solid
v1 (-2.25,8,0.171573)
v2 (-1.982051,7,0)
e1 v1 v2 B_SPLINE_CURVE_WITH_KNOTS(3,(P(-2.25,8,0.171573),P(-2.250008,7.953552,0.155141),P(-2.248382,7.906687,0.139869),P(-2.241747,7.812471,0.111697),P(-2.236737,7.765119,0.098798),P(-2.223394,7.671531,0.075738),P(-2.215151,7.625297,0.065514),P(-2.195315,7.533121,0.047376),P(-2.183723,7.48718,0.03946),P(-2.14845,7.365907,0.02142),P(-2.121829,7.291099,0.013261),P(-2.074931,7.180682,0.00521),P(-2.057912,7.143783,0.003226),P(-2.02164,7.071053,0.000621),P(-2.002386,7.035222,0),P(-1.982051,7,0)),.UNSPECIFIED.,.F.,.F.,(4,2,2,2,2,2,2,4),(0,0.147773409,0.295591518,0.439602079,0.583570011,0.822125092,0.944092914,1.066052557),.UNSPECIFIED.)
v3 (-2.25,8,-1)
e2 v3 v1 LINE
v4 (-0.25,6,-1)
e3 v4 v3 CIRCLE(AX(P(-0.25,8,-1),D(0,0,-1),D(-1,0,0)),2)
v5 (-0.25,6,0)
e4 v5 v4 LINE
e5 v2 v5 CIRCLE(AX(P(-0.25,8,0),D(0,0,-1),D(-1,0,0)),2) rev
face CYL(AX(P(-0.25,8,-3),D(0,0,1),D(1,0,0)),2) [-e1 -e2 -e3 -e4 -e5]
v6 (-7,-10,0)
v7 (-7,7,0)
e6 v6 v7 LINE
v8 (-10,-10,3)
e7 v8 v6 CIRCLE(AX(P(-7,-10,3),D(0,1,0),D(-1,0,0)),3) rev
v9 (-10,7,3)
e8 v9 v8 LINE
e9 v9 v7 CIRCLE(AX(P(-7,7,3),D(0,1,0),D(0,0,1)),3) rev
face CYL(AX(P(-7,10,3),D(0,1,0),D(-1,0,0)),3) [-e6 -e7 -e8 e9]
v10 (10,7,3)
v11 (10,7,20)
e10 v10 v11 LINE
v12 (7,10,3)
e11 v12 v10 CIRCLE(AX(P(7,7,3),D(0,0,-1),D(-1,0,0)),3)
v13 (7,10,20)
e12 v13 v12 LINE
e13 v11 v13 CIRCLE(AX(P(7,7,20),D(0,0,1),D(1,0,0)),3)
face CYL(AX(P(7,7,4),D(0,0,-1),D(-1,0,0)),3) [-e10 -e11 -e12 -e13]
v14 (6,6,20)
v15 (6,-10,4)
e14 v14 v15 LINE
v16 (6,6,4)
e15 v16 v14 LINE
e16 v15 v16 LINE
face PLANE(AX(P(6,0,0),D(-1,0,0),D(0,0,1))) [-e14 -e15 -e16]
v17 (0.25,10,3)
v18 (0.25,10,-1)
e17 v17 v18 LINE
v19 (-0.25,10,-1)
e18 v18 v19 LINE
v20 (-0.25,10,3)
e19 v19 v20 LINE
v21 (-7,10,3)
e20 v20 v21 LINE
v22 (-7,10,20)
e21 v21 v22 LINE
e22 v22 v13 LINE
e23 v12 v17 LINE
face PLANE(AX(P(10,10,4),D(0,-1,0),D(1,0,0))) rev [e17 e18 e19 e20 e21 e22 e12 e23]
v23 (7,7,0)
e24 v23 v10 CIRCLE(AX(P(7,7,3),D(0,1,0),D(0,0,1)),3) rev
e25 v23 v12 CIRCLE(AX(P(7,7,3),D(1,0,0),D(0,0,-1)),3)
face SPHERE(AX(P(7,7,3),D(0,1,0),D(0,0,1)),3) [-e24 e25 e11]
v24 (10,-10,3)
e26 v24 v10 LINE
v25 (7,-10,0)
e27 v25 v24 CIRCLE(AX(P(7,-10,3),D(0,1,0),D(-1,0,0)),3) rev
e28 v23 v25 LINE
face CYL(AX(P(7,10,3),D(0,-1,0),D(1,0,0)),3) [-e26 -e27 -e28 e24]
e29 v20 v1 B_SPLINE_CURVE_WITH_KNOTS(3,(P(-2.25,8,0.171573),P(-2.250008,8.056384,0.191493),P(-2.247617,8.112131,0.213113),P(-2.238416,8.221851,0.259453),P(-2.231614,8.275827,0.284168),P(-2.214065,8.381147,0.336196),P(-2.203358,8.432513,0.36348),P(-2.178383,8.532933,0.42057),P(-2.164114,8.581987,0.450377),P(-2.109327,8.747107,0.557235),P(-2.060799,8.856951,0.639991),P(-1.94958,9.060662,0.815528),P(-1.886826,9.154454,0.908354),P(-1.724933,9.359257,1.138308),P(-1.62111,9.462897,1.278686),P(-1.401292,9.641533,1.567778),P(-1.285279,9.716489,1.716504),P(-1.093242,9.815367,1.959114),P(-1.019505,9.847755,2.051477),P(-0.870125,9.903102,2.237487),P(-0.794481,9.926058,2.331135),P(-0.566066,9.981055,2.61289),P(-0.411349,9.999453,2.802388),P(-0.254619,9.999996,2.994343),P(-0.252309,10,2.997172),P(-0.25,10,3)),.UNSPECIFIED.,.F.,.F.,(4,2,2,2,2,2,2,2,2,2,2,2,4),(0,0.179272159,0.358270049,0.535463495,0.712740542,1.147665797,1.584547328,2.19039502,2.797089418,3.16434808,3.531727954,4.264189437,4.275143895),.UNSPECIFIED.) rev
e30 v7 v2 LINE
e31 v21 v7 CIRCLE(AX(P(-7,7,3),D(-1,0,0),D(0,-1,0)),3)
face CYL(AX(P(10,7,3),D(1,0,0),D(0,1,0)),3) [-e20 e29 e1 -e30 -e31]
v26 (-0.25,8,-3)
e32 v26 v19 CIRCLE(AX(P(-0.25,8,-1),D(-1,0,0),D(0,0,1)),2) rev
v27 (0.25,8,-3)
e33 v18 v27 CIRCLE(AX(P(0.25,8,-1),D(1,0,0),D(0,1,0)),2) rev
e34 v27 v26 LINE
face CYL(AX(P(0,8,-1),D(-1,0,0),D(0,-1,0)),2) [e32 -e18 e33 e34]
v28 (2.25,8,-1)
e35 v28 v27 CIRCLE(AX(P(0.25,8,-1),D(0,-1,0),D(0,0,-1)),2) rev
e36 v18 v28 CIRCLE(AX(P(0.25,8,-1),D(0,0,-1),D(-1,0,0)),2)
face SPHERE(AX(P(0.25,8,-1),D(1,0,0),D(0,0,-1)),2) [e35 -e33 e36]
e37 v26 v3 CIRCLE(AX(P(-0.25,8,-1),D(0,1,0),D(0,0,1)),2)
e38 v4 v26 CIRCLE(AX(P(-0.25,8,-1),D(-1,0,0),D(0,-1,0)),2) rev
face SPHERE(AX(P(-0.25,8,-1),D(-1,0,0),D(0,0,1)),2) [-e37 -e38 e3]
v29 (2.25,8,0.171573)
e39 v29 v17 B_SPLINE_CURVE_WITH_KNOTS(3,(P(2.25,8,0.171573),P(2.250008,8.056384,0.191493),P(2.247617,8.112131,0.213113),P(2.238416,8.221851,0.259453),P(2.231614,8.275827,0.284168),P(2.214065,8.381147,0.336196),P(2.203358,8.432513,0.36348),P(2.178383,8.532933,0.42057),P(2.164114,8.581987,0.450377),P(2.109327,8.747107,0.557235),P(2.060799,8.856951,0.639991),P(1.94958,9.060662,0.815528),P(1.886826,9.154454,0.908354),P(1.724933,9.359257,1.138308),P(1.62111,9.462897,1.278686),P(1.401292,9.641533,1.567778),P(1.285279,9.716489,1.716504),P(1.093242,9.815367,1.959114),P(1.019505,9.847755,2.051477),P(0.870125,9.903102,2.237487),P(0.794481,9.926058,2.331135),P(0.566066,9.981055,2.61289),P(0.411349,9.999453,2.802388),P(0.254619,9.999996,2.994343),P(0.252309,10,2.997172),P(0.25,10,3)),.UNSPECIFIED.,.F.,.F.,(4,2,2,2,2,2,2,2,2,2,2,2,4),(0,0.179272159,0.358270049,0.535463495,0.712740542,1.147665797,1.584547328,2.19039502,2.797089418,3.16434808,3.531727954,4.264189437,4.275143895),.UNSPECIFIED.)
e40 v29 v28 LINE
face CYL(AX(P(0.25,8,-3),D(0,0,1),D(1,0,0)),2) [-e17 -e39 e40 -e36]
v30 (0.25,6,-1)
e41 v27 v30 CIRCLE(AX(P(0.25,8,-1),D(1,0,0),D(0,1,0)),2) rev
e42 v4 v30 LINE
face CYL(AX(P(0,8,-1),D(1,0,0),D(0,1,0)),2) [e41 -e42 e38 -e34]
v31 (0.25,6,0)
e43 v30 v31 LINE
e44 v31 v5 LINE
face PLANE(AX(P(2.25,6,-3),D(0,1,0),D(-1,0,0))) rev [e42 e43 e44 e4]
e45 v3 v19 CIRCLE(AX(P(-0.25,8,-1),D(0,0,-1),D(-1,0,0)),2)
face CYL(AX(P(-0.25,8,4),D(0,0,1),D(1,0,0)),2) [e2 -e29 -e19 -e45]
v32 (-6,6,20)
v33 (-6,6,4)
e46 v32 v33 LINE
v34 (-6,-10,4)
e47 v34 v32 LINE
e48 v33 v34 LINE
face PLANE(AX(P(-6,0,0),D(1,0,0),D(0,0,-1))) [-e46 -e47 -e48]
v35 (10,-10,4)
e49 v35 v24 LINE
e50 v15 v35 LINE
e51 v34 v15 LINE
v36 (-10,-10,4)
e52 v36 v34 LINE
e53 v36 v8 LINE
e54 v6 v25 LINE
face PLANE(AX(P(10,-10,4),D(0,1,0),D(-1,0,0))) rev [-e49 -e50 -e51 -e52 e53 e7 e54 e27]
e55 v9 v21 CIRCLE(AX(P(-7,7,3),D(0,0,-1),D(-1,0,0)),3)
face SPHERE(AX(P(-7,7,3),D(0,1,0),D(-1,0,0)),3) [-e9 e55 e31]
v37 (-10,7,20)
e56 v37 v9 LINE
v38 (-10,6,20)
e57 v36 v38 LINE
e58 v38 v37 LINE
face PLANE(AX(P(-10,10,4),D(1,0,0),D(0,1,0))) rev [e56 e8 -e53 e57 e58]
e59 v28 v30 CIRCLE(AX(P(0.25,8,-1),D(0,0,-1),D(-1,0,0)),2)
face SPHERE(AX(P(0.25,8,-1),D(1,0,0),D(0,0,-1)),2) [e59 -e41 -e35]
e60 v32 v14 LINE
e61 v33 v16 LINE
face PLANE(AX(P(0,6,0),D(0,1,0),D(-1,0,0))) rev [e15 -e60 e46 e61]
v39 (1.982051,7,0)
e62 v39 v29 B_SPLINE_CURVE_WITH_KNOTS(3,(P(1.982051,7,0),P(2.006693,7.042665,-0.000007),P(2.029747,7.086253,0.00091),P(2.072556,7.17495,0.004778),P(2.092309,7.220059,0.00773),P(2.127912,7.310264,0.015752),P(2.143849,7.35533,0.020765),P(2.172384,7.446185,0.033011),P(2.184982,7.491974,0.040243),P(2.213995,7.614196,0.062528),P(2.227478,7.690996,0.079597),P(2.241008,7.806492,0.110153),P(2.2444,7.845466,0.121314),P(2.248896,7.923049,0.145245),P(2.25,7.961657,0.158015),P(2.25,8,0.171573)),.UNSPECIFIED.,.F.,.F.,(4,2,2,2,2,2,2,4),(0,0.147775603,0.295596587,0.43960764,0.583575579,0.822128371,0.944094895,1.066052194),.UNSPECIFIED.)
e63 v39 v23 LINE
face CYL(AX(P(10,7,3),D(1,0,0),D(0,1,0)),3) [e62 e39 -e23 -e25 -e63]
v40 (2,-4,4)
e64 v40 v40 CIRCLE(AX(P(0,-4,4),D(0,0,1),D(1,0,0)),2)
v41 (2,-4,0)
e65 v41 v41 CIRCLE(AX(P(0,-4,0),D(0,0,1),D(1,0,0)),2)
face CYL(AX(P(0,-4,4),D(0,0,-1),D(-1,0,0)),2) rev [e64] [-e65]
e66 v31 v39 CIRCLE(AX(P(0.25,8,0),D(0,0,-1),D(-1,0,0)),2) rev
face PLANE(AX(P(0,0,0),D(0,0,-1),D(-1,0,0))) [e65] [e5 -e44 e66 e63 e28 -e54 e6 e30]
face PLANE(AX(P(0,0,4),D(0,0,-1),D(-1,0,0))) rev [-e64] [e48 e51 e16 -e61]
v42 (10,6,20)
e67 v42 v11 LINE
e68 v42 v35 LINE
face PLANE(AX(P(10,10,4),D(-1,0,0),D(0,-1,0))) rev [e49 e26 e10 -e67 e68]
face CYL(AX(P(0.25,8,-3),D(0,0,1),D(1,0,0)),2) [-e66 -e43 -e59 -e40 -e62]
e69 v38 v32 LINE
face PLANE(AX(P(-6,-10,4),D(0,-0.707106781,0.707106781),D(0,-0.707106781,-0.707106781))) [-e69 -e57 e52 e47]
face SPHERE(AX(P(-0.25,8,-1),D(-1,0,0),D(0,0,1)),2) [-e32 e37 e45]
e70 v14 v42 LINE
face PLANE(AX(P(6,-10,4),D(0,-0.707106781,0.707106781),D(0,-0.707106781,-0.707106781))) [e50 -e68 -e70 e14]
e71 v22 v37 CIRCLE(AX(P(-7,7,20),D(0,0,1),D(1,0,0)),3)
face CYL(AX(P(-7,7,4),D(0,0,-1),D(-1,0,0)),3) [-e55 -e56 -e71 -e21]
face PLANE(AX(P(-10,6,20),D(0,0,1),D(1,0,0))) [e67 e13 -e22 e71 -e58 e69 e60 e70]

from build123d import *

# Parameters (mm, degrees)
ESQUISSE1_W        = 20
ESQUISSE1_H        = 20
ESQUISSE1_R        = 2
BOSS_EXTRU_1_DEPTH = 4
ESQUISSE2_W        = 20
ESQUISSE2_H        = 20
BOSS_EXTRU_2_DEPTH = 4
BOSS_EXTRU_3_DEPTH = 4
BOSS_EXTRU_4_DEPTH = 4
ESQUISSE5_W        = 4.5
ESQUISSE5_H        = 4
BOSS_EXTRU_5_DEPTH = 3
CONG_1_R           = 3
CONG_2_R           = 2


with BuildPart() as part:
    # Esquisse1 → Boss.-Extru.1 (new body)
    with BuildSketch(Plane.XY):
        Rectangle(ESQUISSE1_W, ESQUISSE1_H)
        with Locations((0, -4)):
            Circle(ESQUISSE1_R, mode=Mode.SUBTRACT)
    extrude(amount=BOSS_EXTRU_1_DEPTH)

    # Esquisse2 → Boss.-Extru.2 (add)
    with BuildSketch(Plane(origin=(0, 10, 0), x_dir=(1, 0, 0), z_dir=(0, 1, 0))):
        with Locations((0, -10)):
            Rectangle(ESQUISSE2_W, ESQUISSE2_H)
    extrude(amount=-BOSS_EXTRU_2_DEPTH)

    # Esquisse3 → Boss.-Extru.3 (add)
    with BuildSketch(Plane.ZY.offset(10)):
        Polygon((4, -10), (20, 6), (4, 6), align=None)
    extrude(amount=-BOSS_EXTRU_3_DEPTH)

    # Esquisse4 → Boss.-Extru.4 (add)
    with BuildSketch(Plane(origin=(10, 0, 0), x_dir=(0, 0, -1), z_dir=(1, 0, 0))):
        Polygon((-20, 6), (-4, 6), (-4, -10), align=None)
    extrude(amount=-BOSS_EXTRU_4_DEPTH)

    # Esquisse5 → Boss.-Extru.5 (add)
    with BuildSketch(Plane(origin=(0, 0, 0), x_dir=(-1, 0, 0), z_dir=(0, 0, -1))):
        with Locations((0, 8)):
            Rectangle(ESQUISSE5_W, ESQUISSE5_H)
    extrude(amount=BOSS_EXTRU_5_DEPTH)

    # Congé1
    cong_1_edges = [part.edges().sort_by_distance(p)[0] for p in [
        (6.125, 10, 0),
        (10, 0, 0),
        (-10, 0, 0),
        (-6.125, 10, 0),
        (-10, 10, 10),
        (10, 10, 10),
    ]]
    fillet(cong_1_edges, radius=CONG_1_R)

    # Congé2
    cong_2_edges = [part.edges().sort_by_distance(p)[0] for p in [
        (-2.25, 10, 0),
    ]]
    fillet(cong_2_edges, radius=CONG_2_R)
    cong_2_2_edges = [part.edges().sort_by_distance(p)[0] for p in [
        (1, 10, -3),
    ]]
    fillet(cong_2_2_edges, radius=CONG_2_R)
    cong_2_3_edges = [part.edges().sort_by_distance(p)[0] for p in [
        (2.25, 10, 1),
    ]]
    fillet(cong_2_3_edges, radius=CONG_2_R)
    cong_2_4_edges = [part.edges().sort_by_distance(p)[0] for p in [
        (-2.25, 6, -0.5),
    ]]
    fillet(cong_2_4_edges, radius=CONG_2_R - 0.0001)  # a hair under: the kernel refuses the full size


solid = part.part
